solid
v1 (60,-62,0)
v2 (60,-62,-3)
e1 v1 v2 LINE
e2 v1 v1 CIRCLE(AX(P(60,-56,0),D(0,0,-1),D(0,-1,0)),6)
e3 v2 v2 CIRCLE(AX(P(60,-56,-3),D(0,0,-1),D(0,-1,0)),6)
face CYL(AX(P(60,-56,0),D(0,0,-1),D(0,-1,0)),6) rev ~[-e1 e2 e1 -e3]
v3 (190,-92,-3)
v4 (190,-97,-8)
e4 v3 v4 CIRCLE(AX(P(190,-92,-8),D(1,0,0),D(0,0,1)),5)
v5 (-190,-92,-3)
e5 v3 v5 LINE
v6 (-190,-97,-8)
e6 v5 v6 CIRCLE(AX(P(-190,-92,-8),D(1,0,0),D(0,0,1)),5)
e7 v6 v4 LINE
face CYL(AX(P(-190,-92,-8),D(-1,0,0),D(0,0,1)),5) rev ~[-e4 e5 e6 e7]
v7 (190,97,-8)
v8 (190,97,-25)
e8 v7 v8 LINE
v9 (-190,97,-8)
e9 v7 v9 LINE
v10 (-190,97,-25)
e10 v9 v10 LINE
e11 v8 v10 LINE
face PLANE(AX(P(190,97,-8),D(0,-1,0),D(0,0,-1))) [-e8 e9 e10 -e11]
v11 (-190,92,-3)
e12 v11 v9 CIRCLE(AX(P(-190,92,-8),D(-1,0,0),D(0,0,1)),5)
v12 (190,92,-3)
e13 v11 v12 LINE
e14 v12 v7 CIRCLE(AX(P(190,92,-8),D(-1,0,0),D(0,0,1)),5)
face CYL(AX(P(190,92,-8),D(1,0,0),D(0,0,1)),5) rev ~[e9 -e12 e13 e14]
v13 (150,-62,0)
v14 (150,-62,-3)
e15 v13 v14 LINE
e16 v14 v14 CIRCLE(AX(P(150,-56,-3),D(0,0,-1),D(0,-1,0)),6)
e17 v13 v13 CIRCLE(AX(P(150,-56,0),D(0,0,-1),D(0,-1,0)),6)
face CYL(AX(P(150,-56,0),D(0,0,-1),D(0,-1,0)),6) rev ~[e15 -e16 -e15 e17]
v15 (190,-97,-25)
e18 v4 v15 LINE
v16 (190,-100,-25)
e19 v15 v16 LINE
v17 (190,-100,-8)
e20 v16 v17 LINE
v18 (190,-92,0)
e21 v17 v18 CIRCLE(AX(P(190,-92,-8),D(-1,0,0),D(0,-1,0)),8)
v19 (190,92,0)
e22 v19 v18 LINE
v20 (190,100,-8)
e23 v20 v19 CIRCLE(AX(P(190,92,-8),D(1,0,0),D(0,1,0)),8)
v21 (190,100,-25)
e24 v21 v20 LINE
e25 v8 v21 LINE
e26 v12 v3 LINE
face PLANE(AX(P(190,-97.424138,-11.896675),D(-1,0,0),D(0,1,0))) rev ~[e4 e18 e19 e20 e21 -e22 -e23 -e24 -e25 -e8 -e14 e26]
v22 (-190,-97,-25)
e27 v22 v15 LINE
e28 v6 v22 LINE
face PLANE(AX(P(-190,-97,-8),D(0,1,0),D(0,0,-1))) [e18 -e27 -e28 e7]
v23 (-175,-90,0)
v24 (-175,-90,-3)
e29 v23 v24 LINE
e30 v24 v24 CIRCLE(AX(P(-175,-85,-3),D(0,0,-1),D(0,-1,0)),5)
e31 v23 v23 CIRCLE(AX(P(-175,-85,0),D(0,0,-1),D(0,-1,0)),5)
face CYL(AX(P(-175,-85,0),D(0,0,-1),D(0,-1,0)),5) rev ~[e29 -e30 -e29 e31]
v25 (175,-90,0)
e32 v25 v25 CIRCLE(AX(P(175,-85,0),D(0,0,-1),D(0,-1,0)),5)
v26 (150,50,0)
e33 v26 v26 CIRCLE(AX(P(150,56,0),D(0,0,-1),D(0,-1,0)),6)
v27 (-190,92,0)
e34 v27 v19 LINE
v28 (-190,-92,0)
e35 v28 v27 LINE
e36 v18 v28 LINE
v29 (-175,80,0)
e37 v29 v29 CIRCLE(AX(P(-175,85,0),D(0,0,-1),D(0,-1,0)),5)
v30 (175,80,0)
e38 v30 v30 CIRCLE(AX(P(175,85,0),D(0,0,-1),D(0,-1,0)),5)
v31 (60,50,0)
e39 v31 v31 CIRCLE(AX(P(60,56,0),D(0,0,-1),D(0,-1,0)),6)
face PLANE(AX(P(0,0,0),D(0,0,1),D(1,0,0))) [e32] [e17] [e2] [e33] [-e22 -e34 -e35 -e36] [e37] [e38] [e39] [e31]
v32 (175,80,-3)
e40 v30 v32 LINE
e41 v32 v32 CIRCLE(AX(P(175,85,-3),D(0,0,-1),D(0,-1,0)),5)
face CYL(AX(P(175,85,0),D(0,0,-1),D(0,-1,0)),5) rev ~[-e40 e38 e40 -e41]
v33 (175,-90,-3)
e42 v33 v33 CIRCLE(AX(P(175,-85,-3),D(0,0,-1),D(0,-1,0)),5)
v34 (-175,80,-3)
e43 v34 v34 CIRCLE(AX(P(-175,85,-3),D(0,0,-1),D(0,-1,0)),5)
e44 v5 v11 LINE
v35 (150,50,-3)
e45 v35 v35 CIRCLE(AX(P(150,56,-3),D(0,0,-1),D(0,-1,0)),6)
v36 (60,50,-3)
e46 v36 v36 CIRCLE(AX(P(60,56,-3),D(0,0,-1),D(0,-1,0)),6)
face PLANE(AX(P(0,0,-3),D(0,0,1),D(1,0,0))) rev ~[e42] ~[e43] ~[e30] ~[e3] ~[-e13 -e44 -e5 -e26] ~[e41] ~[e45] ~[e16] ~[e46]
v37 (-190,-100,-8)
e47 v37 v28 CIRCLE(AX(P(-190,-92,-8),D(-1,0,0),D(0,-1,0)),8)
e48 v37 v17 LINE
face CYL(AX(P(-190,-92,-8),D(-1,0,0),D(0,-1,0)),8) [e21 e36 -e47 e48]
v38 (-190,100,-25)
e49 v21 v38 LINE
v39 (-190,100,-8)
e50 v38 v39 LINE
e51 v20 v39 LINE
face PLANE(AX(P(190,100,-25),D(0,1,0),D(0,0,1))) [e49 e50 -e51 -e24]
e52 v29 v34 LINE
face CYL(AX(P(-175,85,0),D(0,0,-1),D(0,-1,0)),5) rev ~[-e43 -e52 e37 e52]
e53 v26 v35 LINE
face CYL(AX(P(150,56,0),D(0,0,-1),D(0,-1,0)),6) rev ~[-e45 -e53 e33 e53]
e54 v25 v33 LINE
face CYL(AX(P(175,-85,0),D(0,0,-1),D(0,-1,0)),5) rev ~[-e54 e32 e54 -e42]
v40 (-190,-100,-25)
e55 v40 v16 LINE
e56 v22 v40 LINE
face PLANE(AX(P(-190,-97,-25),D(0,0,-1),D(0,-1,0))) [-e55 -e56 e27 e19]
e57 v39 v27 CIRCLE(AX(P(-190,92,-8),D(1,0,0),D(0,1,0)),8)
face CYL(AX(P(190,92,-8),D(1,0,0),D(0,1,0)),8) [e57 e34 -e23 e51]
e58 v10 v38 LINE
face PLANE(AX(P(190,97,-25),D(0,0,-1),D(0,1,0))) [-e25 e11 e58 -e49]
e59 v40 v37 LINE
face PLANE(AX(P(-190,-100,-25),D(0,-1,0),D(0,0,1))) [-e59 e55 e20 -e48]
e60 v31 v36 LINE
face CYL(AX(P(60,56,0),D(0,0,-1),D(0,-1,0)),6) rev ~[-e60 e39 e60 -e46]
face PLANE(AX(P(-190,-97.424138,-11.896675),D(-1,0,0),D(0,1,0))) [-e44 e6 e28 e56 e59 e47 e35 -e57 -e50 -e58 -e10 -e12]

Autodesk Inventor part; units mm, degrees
ref_plane "YZ Plane" through (0, 0, 0) normal (1, 0, 0) x (0, 1, 0)
ref_plane "XZ Plane" through (0, 0, 0) normal (0, 1, 0) x (-1, 0, 0)
ref_plane "XY Plane" through (0, 0, 0) normal (0, 0, 1) x (1, 0, 0)
sketch "Sketch1" plane through (0, 0, 0) normal (0, 0, 1) x (1, 0, 0)
  line L0 (-190, 100) -> (190, 100)
  line L1 (190, 100) -> (190, -100)
  line L2 (190, -100) -> (-190, -100)
  line L3 (-190, -100) -> (-190, 100)
  line L4 (-190, 100) -> (190, -100) construction
  point P0 (0, 0)
  point P1 (0, 0)
  dimension "d0" = 380
  dimension "d1" = 200
extrude "Plate1" add sketch "Sketch1" against normal blind 3
sketch "Sketch2" plane through (0, 0, 0) normal (0, 0, 1) x (1, 0, 0)
  line L0 (60, 56) -> (150, 56) construction
  line L1 (150, 56) -> (150, -56) construction
  line L2 (150, -56) -> (60, -56) construction
  line L3 (60, -56) -> (60, 56) construction
  line L4 (190, -100) -> (190, 100) projected
  point P0 (0, 0)
  point P1 (60, 0)
  dimension "d3" = 90
  dimension "d4" = 112
  dimension "d5" = 40
hole "Hole1" at (60, 56, 0) at (150, 56, 0) at (60, -56, 0) at (150, -56, 0) direction (0, 0, -1) diameter 12 end through all
sketch "Sketch3" plane through (0, 0, 0) normal (0, 0, 1) x (1, 0, 0)
  line L0 (-175, 85) -> (175, 85) construction
  line L1 (175, 85) -> (175, -85) construction
  line L2 (175, -85) -> (-175, -85) construction
  line L3 (-175, -85) -> (-175, 85) construction
  line L4 (-175, 85) -> (175, -85) construction
  point P0 (0, 0)
  point P1 (0, 0)
  dimension "d14" = 170
  dimension "d15" = 350
hole "Hole2" at (-175, 85, 0) at (175, 85, 0) at (175, -85, 0) at (-175, -85, 0) direction (0, 0, -1) diameter 10 end through all
sketch "Sketch4" plane through (-190, -97, 0) normal (0, -1, 0) x (1, 0, 0)
  line L0 (380, 0) -> (0, 0)
  line L1 (0, 0) -> (0, -25)
  line L2 (0, -25) -> (380, -25)
  line L3 (380, -25) -> (380, 0)
edge flange "Flange1" height 25 angle 90 thickness 3 bend radius 5 thickness toward (0, -1, 0) relief round relief width 3 relief depth 1.5 corner gap 5 corner form 0 edges at (0, -100, -3) (0, 100, -3) wall of the first edge with corners at (190, -97, 0) (-190, -97, 0) (-190, -97, -25) (190, -97, -25)
bend "Bend1"
corner "Corner1"
equation "\"d11\" = Thickness"
equation "\"d2\" = Thickness"
equation "\"d23\" = BendReliefWidth"
equation "\"d24\" = BendReliefDepth"
equation "\"d25\" = MinimumRemnant"
equation "\"d26\" = TransitionRadius"
equation "\"d29\" = BendRadius"
equation "\"d30\" = CornerReliefSize"
equation "\"d31\" = GapSize"
equation "\"d32\" = JacobiRadiusSize"
equation "\"BendReliefWidth\" = Thickness"
equation "\"BendReliefDepth\" = 0.5 * Thickness"
equation "\"CornerReliefSize\" = 4 * Thickness"
equation "\"MinimumRemnant\" = 2 * Thickness"
equation "\"TransitionRadius\" = BendRadius"
equation "\"JacobiRadiusSize\" = BendRadius"
equation "\"GapSize\" = Thickness"
equation "\"Thickness\" = 3"
equation "\"BendRadius\" = 5"
properties part number "BURUN plate" material "Stainless Steel"
